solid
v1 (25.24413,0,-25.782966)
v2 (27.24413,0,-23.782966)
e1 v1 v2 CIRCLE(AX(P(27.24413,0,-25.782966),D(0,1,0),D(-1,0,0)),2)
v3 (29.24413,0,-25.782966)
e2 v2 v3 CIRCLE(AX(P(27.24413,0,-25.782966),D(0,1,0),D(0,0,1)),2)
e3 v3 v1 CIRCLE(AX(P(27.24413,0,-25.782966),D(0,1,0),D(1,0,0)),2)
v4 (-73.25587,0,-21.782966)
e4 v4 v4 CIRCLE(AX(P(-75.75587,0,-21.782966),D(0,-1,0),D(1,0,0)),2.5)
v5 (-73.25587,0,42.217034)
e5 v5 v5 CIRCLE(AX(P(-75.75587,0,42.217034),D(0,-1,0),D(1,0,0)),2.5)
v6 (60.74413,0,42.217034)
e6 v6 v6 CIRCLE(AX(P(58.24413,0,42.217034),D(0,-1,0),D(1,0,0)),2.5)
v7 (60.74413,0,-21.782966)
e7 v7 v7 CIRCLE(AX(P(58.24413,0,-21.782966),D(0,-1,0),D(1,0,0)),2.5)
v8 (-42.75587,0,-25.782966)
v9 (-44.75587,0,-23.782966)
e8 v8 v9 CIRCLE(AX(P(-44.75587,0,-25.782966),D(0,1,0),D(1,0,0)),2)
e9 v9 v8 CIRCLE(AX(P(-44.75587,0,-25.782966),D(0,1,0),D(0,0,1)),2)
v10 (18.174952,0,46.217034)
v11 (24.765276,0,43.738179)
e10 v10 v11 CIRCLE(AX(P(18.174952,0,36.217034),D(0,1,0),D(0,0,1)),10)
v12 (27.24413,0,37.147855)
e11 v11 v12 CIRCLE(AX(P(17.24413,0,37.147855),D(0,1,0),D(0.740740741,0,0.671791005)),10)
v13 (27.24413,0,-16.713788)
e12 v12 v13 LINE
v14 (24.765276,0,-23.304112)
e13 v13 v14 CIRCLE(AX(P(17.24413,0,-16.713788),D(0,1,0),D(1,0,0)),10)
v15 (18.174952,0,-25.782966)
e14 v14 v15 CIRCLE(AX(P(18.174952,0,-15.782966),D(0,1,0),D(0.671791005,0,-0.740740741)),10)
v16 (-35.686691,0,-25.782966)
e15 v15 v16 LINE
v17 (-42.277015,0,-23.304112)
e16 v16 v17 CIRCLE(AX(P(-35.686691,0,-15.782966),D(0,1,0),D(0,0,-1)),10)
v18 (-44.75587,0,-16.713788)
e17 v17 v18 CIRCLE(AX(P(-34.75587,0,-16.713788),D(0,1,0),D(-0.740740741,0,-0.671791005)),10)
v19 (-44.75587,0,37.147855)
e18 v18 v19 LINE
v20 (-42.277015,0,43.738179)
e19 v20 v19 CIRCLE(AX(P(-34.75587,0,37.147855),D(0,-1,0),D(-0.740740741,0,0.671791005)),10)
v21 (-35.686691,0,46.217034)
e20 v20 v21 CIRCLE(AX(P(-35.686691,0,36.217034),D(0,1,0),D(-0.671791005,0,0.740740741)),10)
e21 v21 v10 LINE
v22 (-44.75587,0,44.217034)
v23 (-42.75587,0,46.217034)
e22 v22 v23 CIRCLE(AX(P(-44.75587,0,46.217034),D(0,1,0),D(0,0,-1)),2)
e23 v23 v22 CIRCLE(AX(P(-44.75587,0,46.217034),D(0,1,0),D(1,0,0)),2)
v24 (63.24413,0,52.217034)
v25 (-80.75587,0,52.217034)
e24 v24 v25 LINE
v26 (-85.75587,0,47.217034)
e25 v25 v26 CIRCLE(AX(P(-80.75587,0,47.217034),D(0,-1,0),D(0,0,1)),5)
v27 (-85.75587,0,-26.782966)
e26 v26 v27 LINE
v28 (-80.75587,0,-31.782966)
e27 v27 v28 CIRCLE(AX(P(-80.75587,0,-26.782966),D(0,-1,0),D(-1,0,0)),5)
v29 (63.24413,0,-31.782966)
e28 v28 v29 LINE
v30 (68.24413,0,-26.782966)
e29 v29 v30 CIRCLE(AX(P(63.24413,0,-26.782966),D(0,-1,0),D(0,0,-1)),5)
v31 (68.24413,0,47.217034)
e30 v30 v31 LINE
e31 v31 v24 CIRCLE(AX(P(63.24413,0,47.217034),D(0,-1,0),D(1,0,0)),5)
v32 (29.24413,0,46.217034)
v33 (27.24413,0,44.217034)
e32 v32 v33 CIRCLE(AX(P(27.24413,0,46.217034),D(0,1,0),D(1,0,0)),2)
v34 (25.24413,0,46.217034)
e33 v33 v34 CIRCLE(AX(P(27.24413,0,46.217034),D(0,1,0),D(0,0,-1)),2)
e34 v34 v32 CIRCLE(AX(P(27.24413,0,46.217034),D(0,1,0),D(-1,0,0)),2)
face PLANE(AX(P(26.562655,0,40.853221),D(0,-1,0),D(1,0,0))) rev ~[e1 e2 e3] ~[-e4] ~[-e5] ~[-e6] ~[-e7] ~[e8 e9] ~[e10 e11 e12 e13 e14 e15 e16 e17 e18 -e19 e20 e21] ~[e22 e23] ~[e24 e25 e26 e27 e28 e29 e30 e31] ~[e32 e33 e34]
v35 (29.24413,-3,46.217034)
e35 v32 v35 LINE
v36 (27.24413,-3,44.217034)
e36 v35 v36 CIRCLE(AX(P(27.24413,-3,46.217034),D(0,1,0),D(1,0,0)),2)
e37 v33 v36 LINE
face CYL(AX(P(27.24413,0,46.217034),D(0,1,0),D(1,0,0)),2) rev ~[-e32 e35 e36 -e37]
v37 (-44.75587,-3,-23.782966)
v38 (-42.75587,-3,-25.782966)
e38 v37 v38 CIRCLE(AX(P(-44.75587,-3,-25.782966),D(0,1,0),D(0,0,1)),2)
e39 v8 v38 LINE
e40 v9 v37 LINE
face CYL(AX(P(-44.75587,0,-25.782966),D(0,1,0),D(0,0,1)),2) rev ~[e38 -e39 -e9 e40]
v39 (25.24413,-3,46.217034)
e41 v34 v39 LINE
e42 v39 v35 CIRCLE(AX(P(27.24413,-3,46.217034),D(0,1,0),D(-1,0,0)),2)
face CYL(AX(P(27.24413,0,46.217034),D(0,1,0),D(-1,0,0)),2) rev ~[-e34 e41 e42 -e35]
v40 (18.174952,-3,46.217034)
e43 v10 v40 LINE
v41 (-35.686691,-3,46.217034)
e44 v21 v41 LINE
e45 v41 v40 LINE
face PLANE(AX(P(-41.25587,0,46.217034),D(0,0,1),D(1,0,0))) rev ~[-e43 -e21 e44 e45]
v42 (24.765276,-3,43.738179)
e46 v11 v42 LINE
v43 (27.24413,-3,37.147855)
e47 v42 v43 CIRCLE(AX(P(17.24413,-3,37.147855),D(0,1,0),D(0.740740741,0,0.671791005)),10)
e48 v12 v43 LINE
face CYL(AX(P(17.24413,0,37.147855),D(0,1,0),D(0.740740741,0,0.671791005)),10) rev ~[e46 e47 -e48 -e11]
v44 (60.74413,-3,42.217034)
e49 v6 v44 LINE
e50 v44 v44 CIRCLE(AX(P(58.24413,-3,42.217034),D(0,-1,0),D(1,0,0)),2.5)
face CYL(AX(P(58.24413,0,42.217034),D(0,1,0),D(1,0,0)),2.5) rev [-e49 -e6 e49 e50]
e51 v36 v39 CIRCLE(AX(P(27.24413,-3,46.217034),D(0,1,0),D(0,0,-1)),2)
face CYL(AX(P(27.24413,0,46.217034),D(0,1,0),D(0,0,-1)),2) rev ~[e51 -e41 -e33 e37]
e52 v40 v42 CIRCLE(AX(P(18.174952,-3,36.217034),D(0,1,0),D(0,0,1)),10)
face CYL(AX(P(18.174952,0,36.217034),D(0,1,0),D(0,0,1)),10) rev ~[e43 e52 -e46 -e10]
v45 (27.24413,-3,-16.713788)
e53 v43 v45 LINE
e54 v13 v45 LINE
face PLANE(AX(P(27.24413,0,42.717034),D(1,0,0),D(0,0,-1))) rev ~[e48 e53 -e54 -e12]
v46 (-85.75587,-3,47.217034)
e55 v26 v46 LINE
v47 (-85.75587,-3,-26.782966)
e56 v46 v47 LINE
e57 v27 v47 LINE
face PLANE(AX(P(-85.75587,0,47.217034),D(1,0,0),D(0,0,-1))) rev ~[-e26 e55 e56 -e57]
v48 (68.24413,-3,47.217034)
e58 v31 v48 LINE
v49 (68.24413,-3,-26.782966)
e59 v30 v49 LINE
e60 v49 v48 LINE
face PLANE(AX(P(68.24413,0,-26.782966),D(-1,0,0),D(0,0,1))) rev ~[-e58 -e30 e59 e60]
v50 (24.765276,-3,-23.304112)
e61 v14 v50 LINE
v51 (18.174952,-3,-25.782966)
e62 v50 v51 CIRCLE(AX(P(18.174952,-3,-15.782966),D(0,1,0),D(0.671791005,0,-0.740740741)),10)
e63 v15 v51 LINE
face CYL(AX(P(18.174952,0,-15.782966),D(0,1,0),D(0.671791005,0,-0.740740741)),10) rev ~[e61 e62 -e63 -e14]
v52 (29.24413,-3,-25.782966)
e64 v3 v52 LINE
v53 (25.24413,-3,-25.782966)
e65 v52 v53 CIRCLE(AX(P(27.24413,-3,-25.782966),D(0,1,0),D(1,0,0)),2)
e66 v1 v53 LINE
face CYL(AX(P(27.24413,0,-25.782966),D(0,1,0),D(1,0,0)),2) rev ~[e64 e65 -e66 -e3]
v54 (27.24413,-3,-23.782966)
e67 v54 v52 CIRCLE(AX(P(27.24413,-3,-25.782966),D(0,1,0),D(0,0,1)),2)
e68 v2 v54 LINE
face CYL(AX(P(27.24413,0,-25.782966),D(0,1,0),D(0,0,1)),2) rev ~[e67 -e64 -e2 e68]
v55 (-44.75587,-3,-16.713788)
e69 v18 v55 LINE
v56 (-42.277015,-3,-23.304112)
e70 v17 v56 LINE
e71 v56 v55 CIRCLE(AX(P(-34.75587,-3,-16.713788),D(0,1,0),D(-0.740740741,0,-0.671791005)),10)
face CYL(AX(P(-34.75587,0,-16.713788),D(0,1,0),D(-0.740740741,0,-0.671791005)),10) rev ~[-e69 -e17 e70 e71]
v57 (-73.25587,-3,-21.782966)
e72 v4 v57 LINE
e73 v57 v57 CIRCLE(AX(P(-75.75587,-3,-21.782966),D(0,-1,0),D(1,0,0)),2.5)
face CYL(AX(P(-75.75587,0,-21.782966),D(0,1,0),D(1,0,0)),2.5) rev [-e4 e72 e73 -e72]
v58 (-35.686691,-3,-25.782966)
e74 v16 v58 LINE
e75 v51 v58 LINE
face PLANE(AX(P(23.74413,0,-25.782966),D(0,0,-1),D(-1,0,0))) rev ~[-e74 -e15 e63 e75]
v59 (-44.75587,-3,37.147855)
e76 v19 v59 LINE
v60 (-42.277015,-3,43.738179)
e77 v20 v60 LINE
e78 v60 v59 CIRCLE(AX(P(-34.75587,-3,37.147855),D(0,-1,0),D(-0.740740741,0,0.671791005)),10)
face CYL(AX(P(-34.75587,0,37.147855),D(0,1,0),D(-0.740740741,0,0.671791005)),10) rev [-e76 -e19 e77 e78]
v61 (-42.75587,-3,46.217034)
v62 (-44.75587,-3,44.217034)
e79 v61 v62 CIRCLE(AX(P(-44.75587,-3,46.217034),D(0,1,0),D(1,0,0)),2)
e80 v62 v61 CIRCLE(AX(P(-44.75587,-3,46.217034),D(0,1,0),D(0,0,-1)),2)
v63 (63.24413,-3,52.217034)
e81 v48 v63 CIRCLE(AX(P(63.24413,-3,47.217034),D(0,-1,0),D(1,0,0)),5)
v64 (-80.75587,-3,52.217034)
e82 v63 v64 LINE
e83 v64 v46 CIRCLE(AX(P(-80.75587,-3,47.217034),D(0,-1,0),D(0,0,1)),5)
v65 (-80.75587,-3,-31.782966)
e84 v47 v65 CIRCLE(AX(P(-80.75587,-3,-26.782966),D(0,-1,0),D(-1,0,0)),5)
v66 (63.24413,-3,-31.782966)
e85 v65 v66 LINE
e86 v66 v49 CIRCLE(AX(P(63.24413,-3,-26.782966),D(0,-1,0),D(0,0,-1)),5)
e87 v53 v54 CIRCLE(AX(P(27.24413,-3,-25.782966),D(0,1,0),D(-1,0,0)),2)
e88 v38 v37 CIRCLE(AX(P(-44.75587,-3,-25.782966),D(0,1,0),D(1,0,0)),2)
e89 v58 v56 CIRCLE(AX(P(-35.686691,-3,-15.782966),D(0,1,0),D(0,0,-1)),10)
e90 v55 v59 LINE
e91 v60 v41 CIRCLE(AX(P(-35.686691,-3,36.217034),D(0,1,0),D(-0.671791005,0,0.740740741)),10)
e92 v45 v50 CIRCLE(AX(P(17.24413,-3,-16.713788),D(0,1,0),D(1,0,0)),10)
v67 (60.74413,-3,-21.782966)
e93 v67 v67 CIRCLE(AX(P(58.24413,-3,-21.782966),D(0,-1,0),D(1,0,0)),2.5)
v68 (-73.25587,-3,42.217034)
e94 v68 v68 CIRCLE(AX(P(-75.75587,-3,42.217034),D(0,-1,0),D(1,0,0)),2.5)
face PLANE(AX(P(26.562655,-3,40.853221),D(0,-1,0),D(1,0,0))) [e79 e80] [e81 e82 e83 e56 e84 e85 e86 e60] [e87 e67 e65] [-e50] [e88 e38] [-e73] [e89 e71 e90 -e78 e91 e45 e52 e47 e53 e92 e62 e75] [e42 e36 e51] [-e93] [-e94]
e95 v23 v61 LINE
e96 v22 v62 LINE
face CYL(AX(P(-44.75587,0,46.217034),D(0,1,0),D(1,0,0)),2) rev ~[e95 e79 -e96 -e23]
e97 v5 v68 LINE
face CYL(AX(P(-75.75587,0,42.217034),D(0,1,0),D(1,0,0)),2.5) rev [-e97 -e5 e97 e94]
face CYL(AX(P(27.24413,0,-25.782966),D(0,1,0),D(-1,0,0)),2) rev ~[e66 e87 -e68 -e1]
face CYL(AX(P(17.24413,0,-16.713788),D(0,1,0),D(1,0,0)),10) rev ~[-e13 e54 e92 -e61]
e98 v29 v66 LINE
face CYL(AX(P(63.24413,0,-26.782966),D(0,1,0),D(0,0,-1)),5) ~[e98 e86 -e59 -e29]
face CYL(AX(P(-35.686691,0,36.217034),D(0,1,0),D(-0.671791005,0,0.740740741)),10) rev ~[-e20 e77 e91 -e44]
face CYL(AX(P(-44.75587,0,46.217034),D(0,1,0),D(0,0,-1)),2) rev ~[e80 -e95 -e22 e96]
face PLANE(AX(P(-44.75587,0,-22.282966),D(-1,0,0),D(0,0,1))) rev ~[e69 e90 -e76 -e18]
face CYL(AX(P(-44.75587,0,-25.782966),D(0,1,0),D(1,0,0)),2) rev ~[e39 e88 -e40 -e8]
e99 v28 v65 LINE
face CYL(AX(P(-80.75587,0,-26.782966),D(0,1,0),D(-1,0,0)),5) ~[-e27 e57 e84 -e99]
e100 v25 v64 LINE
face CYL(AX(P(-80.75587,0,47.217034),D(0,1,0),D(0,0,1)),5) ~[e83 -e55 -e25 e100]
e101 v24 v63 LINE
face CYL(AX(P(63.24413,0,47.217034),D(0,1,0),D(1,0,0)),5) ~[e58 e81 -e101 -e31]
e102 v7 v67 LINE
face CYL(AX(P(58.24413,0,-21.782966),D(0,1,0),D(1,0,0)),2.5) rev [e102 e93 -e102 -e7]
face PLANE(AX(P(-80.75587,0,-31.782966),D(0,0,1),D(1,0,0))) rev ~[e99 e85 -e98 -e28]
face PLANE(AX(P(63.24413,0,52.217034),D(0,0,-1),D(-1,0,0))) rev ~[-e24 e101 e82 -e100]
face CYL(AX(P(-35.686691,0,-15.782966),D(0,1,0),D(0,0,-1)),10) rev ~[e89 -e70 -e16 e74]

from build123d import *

# Parameters (mm, degrees)
F0_R        = 2.5
F1_DEPTH    = 3
F2_T1_DEPTH = 3


# Not quite as in the source:
# - a fillet or chamfer that OpenCascade refuses, or shapes differently, is made with other operations: its cross-section is extruded or revolved along the edge and cut away or added


with BuildPart() as f1:
    # F0 (on Front) → F1 (new body)
    with BuildSketch(Plane.XZ):
        with BuildLine():
            Line((-85.7558696013, 2.2170336112), (-85.7558696013, -11.7829663888))
            Line((-85.7558696013, -11.7829663888), (-85.7558696013, -26.7829663888))
            ThreePointArc((-85.7558696013, -26.7829663888), (-84.2914035073, -30.3185002947), (-80.7558696013, -31.7829663888))
            Line((-80.7558696013, -31.7829663888), (-70.7558696013, -31.7829663888))
            Line((-70.7558696013, -31.7829663888), (53.2441303987, -31.7829663888))
            Line((53.2441303987, -31.7829663888), (63.2441303987, -31.7829663888))
            ThreePointArc((63.2441303987, -31.7829663888), (66.7796643046, -30.3185002947), (68.2441303987, -26.7829663888))
            Line((68.2441303987, -26.7829663888), (68.2441303987, -17.7829663888))
            Line((68.2441303987, -17.7829663888), (68.2441303987, -11.7829663888))
            Line((68.2441303987, -11.7829663888), (68.2441303987, -2.7829663888))
            Line((68.2441303987, -2.7829663888), (68.2441303987, 2.2170336112))
            Line((68.2441303987, 2.2170336112), (68.2441303987, 32.2170336112))
            Line((68.2441303987, 32.2170336112), (68.2441303987, 47.2170336112))
            ThreePointArc((68.2441303987, 47.2170336112), (66.7796643046, 50.7525675171), (63.2441303987, 52.2170336112))
            Line((63.2441303987, 52.2170336112), (53.2441303987, 52.2170336112))
            Line((53.2441303987, 52.2170336112), (-70.7558696013, 52.2170336112))
            Line((-70.7558696013, 52.2170336112), (-80.7558696013, 52.2170336112))
            ThreePointArc((-80.7558696013, 52.2170336112), (-84.2914035073, 50.7525675171), (-85.7558696013, 47.2170336112))
            Line((-85.7558696013, 47.2170336112), (-85.7558696013, 32.2170336112))
            Line((-85.7558696013, 32.2170336112), (-85.7558696013, 2.2170336112))
        make_face()
        with Locations((-75.7558696013, -21.7829663888)):
            Circle(F0_R, mode=Mode.SUBTRACT)
        with BuildLine():
            ThreePointArc((-44.7558696013, 42.7170336112), (-47.2307433355, 48.6919073454), (-41.2558696013, 46.2170336112))
            Line((-41.2558696013, 46.2170336112), (23.7441303987, 46.2170336112))
            ThreePointArc((23.7441303987, 46.2170336112), (27.2441303987, 49.7170336112), (30.7441303987, 46.2170336112))
            ThreePointArc((30.7441303987, 46.2170336112), (29.7190041328, 43.7421598771), (27.2441303987, 42.7170336112))
            Line((27.2441303987, 42.7170336112), (27.2441303987, -22.2829663888))
            ThreePointArc((27.2441303987, -22.2829663888), (29.7190041328, -23.3080926546), (30.7441303987, -25.7829663888))
            ThreePointArc((30.7441303987, -25.7829663888), (27.2441303987, -29.2829663888), (23.7441303987, -25.7829663888))
            Line((23.7441303987, -25.7829663888), (-41.2558696013, -25.7829663888))
            ThreePointArc((-41.2558696013, -25.7829663888), (-47.2307433355, -28.2578401229), (-44.7558696013, -22.2829663888))
            Line((-44.7558696013, -22.2829663888), (-44.7558696013, 42.7170336112))
        make_face(mode=Mode.SUBTRACT)
        with Locations((58.2441303987, -21.7829663888)):
            Circle(F0_R, mode=Mode.SUBTRACT)
        with Locations((-75.7558696013, 42.2170336112)):
            Circle(F0_R, mode=Mode.SUBTRACT)
        with Locations((58.2441303987, 42.2170336112)):
            Circle(F0_R, mode=Mode.SUBTRACT)
        with BuildLine():
            ThreePointArc((-44.7558696013, 44.2170336112), (-46.1700831637, 47.6312471736), (-42.7558696013, 46.2170336112))
            Line((-42.7558696013, 46.2170336112), (-41.2558696013, 46.2170336112))
            ThreePointArc((-41.2558696013, 46.2170336112), (-47.2307433355, 48.6919073454), (-44.7558696013, 42.7170336112))
            Line((-44.7558696013, 42.7170336112), (-44.7558696013, 44.2170336112))
        make_face()
        with BuildLine():
            Line((-41.2558696013, 46.2170336112), (-42.7558696013, 46.2170336112))
            ThreePointArc((-42.7558696013, 46.2170336112), (-43.341656039, 44.8028200488), (-44.7558696013, 44.2170336112))
            Line((-44.7558696013, 44.2170336112), (-44.7558696013, 42.7170336112))
            ThreePointArc((-44.7558696013, 42.7170336112), (-42.2809958672, 43.7421598771), (-41.2558696013, 46.2170336112))
        make_face()
        with BuildLine():
            Line((-44.7558696013, -23.7829663888), (-44.7558696013, -22.2829663888))
            ThreePointArc((-44.7558696013, -22.2829663888), (-47.2307433355, -28.2578401229), (-41.2558696013, -25.7829663888))
            Line((-41.2558696013, -25.7829663888), (-42.7558696013, -25.7829663888))
            ThreePointArc((-42.7558696013, -25.7829663888), (-46.1700831637, -27.1971799512), (-44.7558696013, -23.7829663888))
        make_face()
        with BuildLine():
            ThreePointArc((-41.2558696013, -25.7829663888), (-42.2809958672, -23.3080926546), (-44.7558696013, -22.2829663888))
            Line((-44.7558696013, -22.2829663888), (-44.7558696013, -23.7829663888))
            ThreePointArc((-44.7558696013, -23.7829663888), (-43.341656039, -24.3687528264), (-42.7558696013, -25.7829663888))
            Line((-42.7558696013, -25.7829663888), (-41.2558696013, -25.7829663888))
        make_face()
        with BuildLine():
            Line((27.2441303987, -23.7829663888), (27.2441303987, -22.2829663888))
            ThreePointArc((27.2441303987, -22.2829663888), (24.7692566645, -23.3080926546), (23.7441303987, -25.7829663888))
            Line((23.7441303987, -25.7829663888), (25.2441303987, -25.7829663888))
            ThreePointArc((25.2441303987, -25.7829663888), (25.8299168363, -24.3687528264), (27.2441303987, -23.7829663888))
        make_face()
        with BuildLine():
            ThreePointArc((30.7441303987, -25.7829663888), (29.7190041328, -23.3080926546), (27.2441303987, -22.2829663888))
            Line((27.2441303987, -22.2829663888), (27.2441303987, -23.7829663888))
            ThreePointArc((27.2441303987, -23.7829663888), (28.658343961, -24.3687528264), (29.2441303987, -25.7829663888))
            ThreePointArc((29.2441303987, -25.7829663888), (27.2441303987, -27.7829663888), (25.2441303987, -25.7829663888))
            Line((25.2441303987, -25.7829663888), (23.7441303987, -25.7829663888))
            ThreePointArc((23.7441303987, -25.7829663888), (27.2441303987, -29.2829663888), (30.7441303987, -25.7829663888))
        make_face()
        with BuildLine():
            Line((25.2441303987, 46.2170336112), (23.7441303987, 46.2170336112))
            ThreePointArc((23.7441303987, 46.2170336112), (24.7692566645, 43.7421598771), (27.2441303987, 42.7170336112))
            Line((27.2441303987, 42.7170336112), (27.2441303987, 44.2170336112))
            ThreePointArc((27.2441303987, 44.2170336112), (25.8299168363, 44.8028200488), (25.2441303987, 46.2170336112))
        make_face()
        with BuildLine():
            ThreePointArc((30.7441303987, 46.2170336112), (27.2441303987, 49.7170336112), (23.7441303987, 46.2170336112))
            Line((23.7441303987, 46.2170336112), (25.2441303987, 46.2170336112))
            ThreePointArc((25.2441303987, 46.2170336112), (27.2441303987, 48.2170336112), (29.2441303987, 46.2170336112))
            ThreePointArc((29.2441303987, 46.2170336112), (28.658343961, 44.8028200488), (27.2441303987, 44.2170336112))
            Line((27.2441303987, 44.2170336112), (27.2441303987, 42.7170336112))
            ThreePointArc((27.2441303987, 42.7170336112), (29.7190041328, 43.7421598771), (30.7441303987, 46.2170336112))
        make_face()
    extrude(amount=F1_DEPTH)

    # F2: fillet of radius 10 on 8 edges, made by hand

    # F2_s2 → F2_t1 (join)
    with BuildSketch(Plane.XZ):
        with BuildLine():
            ThreePointArc((24.6515378061, 43.8657650921), (26.5734946341, 40.7482665367), (27.2441303987, 37.1478550376))
            Line((27.2441303987, 37.1478550376), (27.2441303987, 42.7170336112))
            ThreePointArc((27.2441303987, 42.7170336112), (25.8262869335, 43.0170773758), (24.6515378061, 43.8657650921))
        make_face()
        with BuildLine():
            ThreePointArc((18.1749518251, 46.2170336112), (21.7753633242, 45.5463978466), (24.8928618796, 43.6244410186))
            ThreePointArc((24.8928618796, 43.6244410186), (24.0441741633, 44.7991901461), (23.7441303987, 46.2170336112))
            Line((23.7441303987, 46.2170336112), (18.1749518251, 46.2170336112))
        make_face()
        with BuildLine():
            ThreePointArc((-42.4046010823, 43.6244410186), (-39.2871025268, 45.5463978466), (-35.6866910277, 46.2170336112))
            Line((-35.6866910277, 46.2170336112), (-41.2558696013, 46.2170336112))
            ThreePointArc((-41.2558696013, 46.2170336112), (-41.5559133659, 44.7991901461), (-42.4046010823, 43.6244410186))
        make_face()
        with BuildLine():
            ThreePointArc((-42.1632770087, 43.8657650921), (-44.0852338368, 40.7482665367), (-44.7558696013, 37.1478550376))
            Line((-44.7558696013, 37.1478550376), (-44.7558696013, 42.7170336112))
            ThreePointArc((-44.7558696013, 42.7170336112), (-43.3380261362, 43.0170773758), (-42.1632770087, 43.8657650921))
        make_face()
        with BuildLine():
            ThreePointArc((-42.1632770087, -23.4316978697), (-44.0852338368, -20.3141993143), (-44.7558696013, -16.7137878152))
            Line((-44.7558696013, -16.7137878152), (-44.7558696013, -22.2829663888))
            ThreePointArc((-44.7558696013, -22.2829663888), (-43.3380261362, -22.5830101534), (-42.1632770087, -23.4316978697))
        make_face()
        with BuildLine():
            ThreePointArc((-35.6866910277, -25.7829663888), (-39.2871025268, -25.1123306242), (-42.4046010823, -23.1903737962))
            ThreePointArc((-42.4046010823, -23.1903737962), (-41.5559133659, -24.3651229237), (-41.2558696013, -25.7829663888))
            Line((-41.2558696013, -25.7829663888), (-35.6866910277, -25.7829663888))
        make_face()
        with BuildLine():
            ThreePointArc((27.2441303987, -16.7137878152), (26.5734946341, -20.3141993143), (24.6515378061, -23.4316978697))
            ThreePointArc((24.6515378061, -23.4316978697), (25.8262869335, -22.5830101534), (27.2441303987, -22.2829663888))
            Line((27.2441303987, -22.2829663888), (27.2441303987, -16.7137878152))
        make_face()
        with BuildLine():
            ThreePointArc((24.8928618796, -23.1903737962), (21.7753633242, -25.1123306242), (18.1749518251, -25.7829663888))
            Line((18.1749518251, -25.7829663888), (23.7441303987, -25.7829663888))
            ThreePointArc((23.7441303987, -25.7829663888), (24.0441741633, -24.3651229237), (24.8928618796, -23.1903737962))
        make_face()
    extrude(amount=F2_T1_DEPTH)


solid = f1.part
